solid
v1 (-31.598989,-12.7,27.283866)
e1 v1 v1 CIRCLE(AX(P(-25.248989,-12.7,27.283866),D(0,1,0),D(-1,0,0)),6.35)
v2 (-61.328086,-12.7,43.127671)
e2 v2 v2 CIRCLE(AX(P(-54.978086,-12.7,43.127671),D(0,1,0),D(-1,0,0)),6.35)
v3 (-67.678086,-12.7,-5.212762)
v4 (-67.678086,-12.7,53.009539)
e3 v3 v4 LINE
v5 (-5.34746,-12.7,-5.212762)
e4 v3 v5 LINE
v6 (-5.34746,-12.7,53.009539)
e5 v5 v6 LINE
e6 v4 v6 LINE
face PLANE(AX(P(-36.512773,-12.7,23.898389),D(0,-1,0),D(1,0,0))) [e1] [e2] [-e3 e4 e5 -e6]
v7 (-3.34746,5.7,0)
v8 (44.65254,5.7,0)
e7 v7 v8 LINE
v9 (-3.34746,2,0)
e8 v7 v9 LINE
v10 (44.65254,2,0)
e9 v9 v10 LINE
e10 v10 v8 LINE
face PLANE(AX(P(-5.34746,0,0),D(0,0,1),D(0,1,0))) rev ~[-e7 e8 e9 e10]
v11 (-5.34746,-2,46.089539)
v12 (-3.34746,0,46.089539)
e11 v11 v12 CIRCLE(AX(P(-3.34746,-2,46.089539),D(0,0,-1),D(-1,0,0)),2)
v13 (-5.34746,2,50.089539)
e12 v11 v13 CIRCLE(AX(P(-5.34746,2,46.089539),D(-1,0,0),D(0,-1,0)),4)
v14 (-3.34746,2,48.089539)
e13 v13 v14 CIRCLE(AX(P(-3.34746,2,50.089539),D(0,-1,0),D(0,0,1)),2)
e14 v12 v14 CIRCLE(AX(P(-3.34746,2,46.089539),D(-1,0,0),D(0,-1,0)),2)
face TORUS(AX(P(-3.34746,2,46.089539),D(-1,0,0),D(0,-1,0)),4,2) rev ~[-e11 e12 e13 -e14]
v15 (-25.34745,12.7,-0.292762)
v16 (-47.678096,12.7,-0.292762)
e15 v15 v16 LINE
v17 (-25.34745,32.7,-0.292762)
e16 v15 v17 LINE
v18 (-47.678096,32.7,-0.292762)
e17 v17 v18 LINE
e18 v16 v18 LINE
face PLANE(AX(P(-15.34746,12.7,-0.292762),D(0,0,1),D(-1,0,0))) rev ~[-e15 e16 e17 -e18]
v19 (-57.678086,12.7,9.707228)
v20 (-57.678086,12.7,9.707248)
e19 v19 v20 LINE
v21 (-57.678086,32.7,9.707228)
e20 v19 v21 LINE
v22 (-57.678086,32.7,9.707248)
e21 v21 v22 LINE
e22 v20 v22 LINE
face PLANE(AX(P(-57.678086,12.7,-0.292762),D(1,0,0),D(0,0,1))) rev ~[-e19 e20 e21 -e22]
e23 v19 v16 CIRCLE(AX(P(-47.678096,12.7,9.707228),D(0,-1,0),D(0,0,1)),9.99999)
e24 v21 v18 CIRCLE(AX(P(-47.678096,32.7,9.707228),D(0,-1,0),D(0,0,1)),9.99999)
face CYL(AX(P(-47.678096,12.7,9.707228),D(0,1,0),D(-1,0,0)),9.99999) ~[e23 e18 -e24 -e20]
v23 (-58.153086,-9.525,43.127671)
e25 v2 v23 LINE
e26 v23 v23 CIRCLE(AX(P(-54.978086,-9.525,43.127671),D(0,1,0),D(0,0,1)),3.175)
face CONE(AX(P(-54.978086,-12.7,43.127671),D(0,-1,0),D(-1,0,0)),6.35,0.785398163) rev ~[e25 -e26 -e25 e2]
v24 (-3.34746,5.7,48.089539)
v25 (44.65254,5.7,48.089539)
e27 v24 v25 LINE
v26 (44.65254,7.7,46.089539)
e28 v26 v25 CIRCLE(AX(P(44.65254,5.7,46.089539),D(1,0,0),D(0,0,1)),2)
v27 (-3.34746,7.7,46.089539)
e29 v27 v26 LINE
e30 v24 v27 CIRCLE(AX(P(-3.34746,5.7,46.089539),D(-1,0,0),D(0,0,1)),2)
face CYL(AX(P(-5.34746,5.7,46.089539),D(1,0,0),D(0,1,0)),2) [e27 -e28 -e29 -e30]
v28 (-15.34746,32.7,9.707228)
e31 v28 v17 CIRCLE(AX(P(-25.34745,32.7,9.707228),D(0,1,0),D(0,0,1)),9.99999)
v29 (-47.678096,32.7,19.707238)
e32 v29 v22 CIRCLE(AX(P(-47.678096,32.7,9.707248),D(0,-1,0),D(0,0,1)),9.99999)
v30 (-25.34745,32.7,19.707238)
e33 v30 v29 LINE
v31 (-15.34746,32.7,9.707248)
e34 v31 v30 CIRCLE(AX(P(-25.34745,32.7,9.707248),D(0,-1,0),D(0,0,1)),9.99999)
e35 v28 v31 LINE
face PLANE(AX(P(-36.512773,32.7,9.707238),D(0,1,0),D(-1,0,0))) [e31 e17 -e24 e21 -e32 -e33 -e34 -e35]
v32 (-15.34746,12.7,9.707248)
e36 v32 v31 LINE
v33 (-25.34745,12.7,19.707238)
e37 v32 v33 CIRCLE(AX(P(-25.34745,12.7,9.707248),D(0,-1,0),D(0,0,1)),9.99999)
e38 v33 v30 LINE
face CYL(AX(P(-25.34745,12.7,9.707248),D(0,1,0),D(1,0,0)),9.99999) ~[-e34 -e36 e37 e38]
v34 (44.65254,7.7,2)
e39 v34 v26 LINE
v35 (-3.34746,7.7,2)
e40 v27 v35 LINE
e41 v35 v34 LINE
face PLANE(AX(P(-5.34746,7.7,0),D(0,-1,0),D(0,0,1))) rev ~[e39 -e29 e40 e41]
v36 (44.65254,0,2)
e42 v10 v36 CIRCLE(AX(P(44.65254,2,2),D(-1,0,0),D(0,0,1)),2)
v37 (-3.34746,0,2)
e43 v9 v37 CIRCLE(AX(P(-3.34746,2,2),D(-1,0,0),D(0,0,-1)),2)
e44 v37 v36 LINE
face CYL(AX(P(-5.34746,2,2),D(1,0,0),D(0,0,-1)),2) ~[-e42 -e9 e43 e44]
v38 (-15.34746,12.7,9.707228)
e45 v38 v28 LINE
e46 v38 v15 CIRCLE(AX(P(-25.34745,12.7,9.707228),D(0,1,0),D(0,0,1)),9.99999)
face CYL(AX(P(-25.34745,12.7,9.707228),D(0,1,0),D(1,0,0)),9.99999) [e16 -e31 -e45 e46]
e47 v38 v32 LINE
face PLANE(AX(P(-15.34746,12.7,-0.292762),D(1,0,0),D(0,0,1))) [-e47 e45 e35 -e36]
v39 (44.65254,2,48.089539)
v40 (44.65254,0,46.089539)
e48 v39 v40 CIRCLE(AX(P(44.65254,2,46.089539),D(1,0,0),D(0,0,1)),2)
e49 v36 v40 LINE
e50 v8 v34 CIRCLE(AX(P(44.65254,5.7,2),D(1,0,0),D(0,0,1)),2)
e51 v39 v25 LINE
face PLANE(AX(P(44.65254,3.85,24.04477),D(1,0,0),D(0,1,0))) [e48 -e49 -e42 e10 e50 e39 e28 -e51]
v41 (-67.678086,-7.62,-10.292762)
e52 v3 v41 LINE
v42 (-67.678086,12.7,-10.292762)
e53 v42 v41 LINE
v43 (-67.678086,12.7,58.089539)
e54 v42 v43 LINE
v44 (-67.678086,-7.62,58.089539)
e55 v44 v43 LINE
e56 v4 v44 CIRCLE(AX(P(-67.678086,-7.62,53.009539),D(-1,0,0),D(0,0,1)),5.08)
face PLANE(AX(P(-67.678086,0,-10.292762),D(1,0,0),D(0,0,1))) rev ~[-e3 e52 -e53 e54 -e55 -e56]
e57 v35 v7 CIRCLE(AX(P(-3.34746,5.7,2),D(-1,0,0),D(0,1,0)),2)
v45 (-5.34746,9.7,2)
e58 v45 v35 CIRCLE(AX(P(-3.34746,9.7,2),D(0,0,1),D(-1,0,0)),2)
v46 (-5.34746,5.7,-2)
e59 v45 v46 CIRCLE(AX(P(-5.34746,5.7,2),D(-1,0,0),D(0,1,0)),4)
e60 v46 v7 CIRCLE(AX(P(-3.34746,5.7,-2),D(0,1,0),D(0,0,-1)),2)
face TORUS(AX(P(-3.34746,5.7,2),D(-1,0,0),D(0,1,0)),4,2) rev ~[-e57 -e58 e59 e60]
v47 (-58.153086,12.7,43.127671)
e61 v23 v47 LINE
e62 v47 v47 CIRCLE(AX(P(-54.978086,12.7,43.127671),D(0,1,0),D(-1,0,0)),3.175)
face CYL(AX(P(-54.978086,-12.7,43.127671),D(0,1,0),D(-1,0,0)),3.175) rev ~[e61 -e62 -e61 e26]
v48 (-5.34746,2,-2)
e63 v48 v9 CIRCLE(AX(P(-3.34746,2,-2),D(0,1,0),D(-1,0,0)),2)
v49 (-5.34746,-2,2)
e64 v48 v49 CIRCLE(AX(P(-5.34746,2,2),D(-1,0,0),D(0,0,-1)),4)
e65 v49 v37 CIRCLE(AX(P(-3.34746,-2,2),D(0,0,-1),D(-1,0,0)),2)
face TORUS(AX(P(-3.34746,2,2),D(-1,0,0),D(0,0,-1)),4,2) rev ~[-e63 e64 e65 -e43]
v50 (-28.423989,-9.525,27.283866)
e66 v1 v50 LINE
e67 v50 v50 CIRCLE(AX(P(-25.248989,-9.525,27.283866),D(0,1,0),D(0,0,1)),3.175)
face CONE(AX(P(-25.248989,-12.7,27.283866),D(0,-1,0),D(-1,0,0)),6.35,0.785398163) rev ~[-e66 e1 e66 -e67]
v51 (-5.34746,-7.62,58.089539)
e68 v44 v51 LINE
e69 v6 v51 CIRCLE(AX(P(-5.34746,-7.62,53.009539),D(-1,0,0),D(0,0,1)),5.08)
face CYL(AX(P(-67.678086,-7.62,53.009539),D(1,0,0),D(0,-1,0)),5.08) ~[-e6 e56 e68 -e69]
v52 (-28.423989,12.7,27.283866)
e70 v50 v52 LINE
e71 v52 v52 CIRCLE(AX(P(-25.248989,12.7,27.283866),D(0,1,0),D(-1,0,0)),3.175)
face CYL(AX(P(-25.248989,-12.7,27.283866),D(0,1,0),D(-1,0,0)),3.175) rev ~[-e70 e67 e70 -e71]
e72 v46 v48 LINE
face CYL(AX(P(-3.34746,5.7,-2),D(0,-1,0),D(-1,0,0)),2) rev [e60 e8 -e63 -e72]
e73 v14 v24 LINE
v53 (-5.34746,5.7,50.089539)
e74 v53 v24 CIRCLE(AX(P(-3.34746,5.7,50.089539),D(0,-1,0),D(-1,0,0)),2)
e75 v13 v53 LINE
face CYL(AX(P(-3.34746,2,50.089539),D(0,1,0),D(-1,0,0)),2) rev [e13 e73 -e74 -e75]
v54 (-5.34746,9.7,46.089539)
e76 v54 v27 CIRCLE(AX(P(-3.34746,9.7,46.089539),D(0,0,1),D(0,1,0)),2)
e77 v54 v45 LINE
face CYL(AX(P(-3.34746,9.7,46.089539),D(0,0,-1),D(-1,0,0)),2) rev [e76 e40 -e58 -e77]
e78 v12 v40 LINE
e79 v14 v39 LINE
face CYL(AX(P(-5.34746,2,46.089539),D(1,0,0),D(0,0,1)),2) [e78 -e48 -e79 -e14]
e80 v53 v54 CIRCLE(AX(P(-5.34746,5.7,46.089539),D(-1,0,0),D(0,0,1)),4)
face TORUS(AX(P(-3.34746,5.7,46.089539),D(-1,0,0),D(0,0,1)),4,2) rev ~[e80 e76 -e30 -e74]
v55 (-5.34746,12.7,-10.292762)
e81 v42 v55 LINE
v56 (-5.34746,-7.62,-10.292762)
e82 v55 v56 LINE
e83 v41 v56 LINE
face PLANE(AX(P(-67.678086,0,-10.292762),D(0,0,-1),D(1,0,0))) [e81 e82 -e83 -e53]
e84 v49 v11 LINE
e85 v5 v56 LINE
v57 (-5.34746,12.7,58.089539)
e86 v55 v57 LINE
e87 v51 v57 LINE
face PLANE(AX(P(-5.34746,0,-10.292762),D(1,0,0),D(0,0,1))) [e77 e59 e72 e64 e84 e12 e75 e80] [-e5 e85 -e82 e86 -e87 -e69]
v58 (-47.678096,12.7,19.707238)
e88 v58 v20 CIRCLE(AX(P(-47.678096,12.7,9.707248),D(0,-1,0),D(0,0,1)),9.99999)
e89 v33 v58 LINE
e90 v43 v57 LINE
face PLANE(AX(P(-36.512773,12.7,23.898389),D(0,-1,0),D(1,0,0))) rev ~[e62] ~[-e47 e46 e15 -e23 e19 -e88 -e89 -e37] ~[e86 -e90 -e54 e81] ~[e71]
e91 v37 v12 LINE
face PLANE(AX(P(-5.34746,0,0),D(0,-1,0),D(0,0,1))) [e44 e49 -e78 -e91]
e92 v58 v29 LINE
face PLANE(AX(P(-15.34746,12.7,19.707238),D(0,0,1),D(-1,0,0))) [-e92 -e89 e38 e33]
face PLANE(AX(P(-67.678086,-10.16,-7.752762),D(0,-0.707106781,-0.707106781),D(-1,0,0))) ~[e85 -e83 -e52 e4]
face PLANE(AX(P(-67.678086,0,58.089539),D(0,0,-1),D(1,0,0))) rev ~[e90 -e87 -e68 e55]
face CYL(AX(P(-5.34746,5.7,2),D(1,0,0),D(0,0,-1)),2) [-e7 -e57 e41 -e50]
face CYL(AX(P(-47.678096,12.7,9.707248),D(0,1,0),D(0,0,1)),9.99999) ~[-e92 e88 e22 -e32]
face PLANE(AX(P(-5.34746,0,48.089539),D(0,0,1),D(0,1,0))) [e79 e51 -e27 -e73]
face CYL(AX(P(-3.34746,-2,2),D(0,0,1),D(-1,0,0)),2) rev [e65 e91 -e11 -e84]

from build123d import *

# Parameters (mm, degrees)
F0_W           = 62.330626417
F0_H           = 68.3823013678
F1_DEPTH       = 12.7
F3_D           = 6.35
F3_CSINK_D     = 12.7
F3_CSINK_ANGLE = 90
F4_R           = 5.08
F5_SIZE        = 5.08
F6_W           = 42.330626417
F6_H           = 20
F7_DEPTH       = 20
F8_R           = 9.99999
F9_W           = 7.7
F9_H           = 48.0895394087
F10_DEPTH      = 50
F11_F1_R       = 2
F11_F2_R       = 2


# Not quite as in the source:
# - a fillet or chamfer is up to 0.001 mm smaller than in the source, because OpenCascade refuses the exact size


with BuildPart() as f1:
    # F0 (on Front) → F1 (new body, symmetric)
    with BuildSketch(Plane.XZ):
        with Locations((-36.5127732512, 23.8983887248)):
            Rectangle(F0_W, F0_H)
    extrude(amount=F1_DEPTH, both=True)

    # F3 (through all)
    with Locations(Plane.XZ.offset(12.7)):
        with Locations((-54.9780864596, 43.1276711741), (-25.2489887894, 27.2838656685)):
            CounterSinkHole(F3_D / 2, F3_CSINK_D / 2, counter_sink_angle=F3_CSINK_ANGLE)

    # F4
    f4_edges = [f1.edges().sort_by_distance(p)[0] for p in [
        (-36.512773, -12.7, 58.089539),
    ]]
    fillet(f4_edges, radius=F4_R)

    # F5
    f5_edges = [f1.edges().sort_by_distance(p)[0] for p in [
        (-36.512773, -12.7, -10.292762),
    ]]
    chamfer(f5_edges, length=F5_SIZE)

    # F6 (on face) → F7 (join)
    with BuildSketch(Plane(origin=(0, 12.7, 0), x_dir=(-1, 0, 0), z_dir=(0, 1, 0))):
        with Locations((36.5127732512, 9.7072380409)):
            Rectangle(F6_W, F6_H)
    extrude(amount=F7_DEPTH)

    # F8 (radius 10 in the source; OpenCascade refuses exactly that, so slightly less here)
    f8_edges = [f1.edges().sort_by_distance(p)[0] for p in [
        (-15.34746, 22.7, 19.707238),
        (-15.34746, 22.7, -0.292762),
        (-57.678086, 22.7, 19.707238),
        (-57.678086, 22.7, -0.292762),
    ]]
    fillet(f8_edges, radius=F8_R)

    # F9 (on face) → F10 (join)
    with BuildSketch(Plane.YZ.offset(-5.3474600427)):
        with Locations((3.85, 24.0447697043)):
            Rectangle(F9_W, F9_H)
    extrude(amount=F10_DEPTH)

    # F11: fillet of radius 2 on 6 edges, made by hand

    # F11_f1
    f11_f1_edges = [f1.edges().sort_by_distance(p)[0] for p in [
        (19.6525399573, 7.7, 48.0895394087),
        (19.6525399573, 0, 48.0895394087),
        (19.6525399573, 7.7, 0),
        (19.6525399573, 0, 0),
    ]]
    fillet(f11_f1_edges, radius=F11_F1_R)

    # F11_f2
    f11_f2_edges = [f1.edges().sort_by_distance(p)[0] for p in [
        (-5.3474600427, 0, 24.0447697043),
        (-5.3474600427, 7.7, 24.0447697043),
        (-5.3474600427, 7.1142135624, 0.5857864376),
        (-5.3474600427, 7.1142135624, 47.5037529711),
        (-5.3474600427, 0.5857864376, 47.5037529711),
        (-5.3474600427, 0.5857864376, 0.5857864376),
    ]]
    fillet(f11_f2_edges, radius=F11_F2_R)


solid = f1.part
